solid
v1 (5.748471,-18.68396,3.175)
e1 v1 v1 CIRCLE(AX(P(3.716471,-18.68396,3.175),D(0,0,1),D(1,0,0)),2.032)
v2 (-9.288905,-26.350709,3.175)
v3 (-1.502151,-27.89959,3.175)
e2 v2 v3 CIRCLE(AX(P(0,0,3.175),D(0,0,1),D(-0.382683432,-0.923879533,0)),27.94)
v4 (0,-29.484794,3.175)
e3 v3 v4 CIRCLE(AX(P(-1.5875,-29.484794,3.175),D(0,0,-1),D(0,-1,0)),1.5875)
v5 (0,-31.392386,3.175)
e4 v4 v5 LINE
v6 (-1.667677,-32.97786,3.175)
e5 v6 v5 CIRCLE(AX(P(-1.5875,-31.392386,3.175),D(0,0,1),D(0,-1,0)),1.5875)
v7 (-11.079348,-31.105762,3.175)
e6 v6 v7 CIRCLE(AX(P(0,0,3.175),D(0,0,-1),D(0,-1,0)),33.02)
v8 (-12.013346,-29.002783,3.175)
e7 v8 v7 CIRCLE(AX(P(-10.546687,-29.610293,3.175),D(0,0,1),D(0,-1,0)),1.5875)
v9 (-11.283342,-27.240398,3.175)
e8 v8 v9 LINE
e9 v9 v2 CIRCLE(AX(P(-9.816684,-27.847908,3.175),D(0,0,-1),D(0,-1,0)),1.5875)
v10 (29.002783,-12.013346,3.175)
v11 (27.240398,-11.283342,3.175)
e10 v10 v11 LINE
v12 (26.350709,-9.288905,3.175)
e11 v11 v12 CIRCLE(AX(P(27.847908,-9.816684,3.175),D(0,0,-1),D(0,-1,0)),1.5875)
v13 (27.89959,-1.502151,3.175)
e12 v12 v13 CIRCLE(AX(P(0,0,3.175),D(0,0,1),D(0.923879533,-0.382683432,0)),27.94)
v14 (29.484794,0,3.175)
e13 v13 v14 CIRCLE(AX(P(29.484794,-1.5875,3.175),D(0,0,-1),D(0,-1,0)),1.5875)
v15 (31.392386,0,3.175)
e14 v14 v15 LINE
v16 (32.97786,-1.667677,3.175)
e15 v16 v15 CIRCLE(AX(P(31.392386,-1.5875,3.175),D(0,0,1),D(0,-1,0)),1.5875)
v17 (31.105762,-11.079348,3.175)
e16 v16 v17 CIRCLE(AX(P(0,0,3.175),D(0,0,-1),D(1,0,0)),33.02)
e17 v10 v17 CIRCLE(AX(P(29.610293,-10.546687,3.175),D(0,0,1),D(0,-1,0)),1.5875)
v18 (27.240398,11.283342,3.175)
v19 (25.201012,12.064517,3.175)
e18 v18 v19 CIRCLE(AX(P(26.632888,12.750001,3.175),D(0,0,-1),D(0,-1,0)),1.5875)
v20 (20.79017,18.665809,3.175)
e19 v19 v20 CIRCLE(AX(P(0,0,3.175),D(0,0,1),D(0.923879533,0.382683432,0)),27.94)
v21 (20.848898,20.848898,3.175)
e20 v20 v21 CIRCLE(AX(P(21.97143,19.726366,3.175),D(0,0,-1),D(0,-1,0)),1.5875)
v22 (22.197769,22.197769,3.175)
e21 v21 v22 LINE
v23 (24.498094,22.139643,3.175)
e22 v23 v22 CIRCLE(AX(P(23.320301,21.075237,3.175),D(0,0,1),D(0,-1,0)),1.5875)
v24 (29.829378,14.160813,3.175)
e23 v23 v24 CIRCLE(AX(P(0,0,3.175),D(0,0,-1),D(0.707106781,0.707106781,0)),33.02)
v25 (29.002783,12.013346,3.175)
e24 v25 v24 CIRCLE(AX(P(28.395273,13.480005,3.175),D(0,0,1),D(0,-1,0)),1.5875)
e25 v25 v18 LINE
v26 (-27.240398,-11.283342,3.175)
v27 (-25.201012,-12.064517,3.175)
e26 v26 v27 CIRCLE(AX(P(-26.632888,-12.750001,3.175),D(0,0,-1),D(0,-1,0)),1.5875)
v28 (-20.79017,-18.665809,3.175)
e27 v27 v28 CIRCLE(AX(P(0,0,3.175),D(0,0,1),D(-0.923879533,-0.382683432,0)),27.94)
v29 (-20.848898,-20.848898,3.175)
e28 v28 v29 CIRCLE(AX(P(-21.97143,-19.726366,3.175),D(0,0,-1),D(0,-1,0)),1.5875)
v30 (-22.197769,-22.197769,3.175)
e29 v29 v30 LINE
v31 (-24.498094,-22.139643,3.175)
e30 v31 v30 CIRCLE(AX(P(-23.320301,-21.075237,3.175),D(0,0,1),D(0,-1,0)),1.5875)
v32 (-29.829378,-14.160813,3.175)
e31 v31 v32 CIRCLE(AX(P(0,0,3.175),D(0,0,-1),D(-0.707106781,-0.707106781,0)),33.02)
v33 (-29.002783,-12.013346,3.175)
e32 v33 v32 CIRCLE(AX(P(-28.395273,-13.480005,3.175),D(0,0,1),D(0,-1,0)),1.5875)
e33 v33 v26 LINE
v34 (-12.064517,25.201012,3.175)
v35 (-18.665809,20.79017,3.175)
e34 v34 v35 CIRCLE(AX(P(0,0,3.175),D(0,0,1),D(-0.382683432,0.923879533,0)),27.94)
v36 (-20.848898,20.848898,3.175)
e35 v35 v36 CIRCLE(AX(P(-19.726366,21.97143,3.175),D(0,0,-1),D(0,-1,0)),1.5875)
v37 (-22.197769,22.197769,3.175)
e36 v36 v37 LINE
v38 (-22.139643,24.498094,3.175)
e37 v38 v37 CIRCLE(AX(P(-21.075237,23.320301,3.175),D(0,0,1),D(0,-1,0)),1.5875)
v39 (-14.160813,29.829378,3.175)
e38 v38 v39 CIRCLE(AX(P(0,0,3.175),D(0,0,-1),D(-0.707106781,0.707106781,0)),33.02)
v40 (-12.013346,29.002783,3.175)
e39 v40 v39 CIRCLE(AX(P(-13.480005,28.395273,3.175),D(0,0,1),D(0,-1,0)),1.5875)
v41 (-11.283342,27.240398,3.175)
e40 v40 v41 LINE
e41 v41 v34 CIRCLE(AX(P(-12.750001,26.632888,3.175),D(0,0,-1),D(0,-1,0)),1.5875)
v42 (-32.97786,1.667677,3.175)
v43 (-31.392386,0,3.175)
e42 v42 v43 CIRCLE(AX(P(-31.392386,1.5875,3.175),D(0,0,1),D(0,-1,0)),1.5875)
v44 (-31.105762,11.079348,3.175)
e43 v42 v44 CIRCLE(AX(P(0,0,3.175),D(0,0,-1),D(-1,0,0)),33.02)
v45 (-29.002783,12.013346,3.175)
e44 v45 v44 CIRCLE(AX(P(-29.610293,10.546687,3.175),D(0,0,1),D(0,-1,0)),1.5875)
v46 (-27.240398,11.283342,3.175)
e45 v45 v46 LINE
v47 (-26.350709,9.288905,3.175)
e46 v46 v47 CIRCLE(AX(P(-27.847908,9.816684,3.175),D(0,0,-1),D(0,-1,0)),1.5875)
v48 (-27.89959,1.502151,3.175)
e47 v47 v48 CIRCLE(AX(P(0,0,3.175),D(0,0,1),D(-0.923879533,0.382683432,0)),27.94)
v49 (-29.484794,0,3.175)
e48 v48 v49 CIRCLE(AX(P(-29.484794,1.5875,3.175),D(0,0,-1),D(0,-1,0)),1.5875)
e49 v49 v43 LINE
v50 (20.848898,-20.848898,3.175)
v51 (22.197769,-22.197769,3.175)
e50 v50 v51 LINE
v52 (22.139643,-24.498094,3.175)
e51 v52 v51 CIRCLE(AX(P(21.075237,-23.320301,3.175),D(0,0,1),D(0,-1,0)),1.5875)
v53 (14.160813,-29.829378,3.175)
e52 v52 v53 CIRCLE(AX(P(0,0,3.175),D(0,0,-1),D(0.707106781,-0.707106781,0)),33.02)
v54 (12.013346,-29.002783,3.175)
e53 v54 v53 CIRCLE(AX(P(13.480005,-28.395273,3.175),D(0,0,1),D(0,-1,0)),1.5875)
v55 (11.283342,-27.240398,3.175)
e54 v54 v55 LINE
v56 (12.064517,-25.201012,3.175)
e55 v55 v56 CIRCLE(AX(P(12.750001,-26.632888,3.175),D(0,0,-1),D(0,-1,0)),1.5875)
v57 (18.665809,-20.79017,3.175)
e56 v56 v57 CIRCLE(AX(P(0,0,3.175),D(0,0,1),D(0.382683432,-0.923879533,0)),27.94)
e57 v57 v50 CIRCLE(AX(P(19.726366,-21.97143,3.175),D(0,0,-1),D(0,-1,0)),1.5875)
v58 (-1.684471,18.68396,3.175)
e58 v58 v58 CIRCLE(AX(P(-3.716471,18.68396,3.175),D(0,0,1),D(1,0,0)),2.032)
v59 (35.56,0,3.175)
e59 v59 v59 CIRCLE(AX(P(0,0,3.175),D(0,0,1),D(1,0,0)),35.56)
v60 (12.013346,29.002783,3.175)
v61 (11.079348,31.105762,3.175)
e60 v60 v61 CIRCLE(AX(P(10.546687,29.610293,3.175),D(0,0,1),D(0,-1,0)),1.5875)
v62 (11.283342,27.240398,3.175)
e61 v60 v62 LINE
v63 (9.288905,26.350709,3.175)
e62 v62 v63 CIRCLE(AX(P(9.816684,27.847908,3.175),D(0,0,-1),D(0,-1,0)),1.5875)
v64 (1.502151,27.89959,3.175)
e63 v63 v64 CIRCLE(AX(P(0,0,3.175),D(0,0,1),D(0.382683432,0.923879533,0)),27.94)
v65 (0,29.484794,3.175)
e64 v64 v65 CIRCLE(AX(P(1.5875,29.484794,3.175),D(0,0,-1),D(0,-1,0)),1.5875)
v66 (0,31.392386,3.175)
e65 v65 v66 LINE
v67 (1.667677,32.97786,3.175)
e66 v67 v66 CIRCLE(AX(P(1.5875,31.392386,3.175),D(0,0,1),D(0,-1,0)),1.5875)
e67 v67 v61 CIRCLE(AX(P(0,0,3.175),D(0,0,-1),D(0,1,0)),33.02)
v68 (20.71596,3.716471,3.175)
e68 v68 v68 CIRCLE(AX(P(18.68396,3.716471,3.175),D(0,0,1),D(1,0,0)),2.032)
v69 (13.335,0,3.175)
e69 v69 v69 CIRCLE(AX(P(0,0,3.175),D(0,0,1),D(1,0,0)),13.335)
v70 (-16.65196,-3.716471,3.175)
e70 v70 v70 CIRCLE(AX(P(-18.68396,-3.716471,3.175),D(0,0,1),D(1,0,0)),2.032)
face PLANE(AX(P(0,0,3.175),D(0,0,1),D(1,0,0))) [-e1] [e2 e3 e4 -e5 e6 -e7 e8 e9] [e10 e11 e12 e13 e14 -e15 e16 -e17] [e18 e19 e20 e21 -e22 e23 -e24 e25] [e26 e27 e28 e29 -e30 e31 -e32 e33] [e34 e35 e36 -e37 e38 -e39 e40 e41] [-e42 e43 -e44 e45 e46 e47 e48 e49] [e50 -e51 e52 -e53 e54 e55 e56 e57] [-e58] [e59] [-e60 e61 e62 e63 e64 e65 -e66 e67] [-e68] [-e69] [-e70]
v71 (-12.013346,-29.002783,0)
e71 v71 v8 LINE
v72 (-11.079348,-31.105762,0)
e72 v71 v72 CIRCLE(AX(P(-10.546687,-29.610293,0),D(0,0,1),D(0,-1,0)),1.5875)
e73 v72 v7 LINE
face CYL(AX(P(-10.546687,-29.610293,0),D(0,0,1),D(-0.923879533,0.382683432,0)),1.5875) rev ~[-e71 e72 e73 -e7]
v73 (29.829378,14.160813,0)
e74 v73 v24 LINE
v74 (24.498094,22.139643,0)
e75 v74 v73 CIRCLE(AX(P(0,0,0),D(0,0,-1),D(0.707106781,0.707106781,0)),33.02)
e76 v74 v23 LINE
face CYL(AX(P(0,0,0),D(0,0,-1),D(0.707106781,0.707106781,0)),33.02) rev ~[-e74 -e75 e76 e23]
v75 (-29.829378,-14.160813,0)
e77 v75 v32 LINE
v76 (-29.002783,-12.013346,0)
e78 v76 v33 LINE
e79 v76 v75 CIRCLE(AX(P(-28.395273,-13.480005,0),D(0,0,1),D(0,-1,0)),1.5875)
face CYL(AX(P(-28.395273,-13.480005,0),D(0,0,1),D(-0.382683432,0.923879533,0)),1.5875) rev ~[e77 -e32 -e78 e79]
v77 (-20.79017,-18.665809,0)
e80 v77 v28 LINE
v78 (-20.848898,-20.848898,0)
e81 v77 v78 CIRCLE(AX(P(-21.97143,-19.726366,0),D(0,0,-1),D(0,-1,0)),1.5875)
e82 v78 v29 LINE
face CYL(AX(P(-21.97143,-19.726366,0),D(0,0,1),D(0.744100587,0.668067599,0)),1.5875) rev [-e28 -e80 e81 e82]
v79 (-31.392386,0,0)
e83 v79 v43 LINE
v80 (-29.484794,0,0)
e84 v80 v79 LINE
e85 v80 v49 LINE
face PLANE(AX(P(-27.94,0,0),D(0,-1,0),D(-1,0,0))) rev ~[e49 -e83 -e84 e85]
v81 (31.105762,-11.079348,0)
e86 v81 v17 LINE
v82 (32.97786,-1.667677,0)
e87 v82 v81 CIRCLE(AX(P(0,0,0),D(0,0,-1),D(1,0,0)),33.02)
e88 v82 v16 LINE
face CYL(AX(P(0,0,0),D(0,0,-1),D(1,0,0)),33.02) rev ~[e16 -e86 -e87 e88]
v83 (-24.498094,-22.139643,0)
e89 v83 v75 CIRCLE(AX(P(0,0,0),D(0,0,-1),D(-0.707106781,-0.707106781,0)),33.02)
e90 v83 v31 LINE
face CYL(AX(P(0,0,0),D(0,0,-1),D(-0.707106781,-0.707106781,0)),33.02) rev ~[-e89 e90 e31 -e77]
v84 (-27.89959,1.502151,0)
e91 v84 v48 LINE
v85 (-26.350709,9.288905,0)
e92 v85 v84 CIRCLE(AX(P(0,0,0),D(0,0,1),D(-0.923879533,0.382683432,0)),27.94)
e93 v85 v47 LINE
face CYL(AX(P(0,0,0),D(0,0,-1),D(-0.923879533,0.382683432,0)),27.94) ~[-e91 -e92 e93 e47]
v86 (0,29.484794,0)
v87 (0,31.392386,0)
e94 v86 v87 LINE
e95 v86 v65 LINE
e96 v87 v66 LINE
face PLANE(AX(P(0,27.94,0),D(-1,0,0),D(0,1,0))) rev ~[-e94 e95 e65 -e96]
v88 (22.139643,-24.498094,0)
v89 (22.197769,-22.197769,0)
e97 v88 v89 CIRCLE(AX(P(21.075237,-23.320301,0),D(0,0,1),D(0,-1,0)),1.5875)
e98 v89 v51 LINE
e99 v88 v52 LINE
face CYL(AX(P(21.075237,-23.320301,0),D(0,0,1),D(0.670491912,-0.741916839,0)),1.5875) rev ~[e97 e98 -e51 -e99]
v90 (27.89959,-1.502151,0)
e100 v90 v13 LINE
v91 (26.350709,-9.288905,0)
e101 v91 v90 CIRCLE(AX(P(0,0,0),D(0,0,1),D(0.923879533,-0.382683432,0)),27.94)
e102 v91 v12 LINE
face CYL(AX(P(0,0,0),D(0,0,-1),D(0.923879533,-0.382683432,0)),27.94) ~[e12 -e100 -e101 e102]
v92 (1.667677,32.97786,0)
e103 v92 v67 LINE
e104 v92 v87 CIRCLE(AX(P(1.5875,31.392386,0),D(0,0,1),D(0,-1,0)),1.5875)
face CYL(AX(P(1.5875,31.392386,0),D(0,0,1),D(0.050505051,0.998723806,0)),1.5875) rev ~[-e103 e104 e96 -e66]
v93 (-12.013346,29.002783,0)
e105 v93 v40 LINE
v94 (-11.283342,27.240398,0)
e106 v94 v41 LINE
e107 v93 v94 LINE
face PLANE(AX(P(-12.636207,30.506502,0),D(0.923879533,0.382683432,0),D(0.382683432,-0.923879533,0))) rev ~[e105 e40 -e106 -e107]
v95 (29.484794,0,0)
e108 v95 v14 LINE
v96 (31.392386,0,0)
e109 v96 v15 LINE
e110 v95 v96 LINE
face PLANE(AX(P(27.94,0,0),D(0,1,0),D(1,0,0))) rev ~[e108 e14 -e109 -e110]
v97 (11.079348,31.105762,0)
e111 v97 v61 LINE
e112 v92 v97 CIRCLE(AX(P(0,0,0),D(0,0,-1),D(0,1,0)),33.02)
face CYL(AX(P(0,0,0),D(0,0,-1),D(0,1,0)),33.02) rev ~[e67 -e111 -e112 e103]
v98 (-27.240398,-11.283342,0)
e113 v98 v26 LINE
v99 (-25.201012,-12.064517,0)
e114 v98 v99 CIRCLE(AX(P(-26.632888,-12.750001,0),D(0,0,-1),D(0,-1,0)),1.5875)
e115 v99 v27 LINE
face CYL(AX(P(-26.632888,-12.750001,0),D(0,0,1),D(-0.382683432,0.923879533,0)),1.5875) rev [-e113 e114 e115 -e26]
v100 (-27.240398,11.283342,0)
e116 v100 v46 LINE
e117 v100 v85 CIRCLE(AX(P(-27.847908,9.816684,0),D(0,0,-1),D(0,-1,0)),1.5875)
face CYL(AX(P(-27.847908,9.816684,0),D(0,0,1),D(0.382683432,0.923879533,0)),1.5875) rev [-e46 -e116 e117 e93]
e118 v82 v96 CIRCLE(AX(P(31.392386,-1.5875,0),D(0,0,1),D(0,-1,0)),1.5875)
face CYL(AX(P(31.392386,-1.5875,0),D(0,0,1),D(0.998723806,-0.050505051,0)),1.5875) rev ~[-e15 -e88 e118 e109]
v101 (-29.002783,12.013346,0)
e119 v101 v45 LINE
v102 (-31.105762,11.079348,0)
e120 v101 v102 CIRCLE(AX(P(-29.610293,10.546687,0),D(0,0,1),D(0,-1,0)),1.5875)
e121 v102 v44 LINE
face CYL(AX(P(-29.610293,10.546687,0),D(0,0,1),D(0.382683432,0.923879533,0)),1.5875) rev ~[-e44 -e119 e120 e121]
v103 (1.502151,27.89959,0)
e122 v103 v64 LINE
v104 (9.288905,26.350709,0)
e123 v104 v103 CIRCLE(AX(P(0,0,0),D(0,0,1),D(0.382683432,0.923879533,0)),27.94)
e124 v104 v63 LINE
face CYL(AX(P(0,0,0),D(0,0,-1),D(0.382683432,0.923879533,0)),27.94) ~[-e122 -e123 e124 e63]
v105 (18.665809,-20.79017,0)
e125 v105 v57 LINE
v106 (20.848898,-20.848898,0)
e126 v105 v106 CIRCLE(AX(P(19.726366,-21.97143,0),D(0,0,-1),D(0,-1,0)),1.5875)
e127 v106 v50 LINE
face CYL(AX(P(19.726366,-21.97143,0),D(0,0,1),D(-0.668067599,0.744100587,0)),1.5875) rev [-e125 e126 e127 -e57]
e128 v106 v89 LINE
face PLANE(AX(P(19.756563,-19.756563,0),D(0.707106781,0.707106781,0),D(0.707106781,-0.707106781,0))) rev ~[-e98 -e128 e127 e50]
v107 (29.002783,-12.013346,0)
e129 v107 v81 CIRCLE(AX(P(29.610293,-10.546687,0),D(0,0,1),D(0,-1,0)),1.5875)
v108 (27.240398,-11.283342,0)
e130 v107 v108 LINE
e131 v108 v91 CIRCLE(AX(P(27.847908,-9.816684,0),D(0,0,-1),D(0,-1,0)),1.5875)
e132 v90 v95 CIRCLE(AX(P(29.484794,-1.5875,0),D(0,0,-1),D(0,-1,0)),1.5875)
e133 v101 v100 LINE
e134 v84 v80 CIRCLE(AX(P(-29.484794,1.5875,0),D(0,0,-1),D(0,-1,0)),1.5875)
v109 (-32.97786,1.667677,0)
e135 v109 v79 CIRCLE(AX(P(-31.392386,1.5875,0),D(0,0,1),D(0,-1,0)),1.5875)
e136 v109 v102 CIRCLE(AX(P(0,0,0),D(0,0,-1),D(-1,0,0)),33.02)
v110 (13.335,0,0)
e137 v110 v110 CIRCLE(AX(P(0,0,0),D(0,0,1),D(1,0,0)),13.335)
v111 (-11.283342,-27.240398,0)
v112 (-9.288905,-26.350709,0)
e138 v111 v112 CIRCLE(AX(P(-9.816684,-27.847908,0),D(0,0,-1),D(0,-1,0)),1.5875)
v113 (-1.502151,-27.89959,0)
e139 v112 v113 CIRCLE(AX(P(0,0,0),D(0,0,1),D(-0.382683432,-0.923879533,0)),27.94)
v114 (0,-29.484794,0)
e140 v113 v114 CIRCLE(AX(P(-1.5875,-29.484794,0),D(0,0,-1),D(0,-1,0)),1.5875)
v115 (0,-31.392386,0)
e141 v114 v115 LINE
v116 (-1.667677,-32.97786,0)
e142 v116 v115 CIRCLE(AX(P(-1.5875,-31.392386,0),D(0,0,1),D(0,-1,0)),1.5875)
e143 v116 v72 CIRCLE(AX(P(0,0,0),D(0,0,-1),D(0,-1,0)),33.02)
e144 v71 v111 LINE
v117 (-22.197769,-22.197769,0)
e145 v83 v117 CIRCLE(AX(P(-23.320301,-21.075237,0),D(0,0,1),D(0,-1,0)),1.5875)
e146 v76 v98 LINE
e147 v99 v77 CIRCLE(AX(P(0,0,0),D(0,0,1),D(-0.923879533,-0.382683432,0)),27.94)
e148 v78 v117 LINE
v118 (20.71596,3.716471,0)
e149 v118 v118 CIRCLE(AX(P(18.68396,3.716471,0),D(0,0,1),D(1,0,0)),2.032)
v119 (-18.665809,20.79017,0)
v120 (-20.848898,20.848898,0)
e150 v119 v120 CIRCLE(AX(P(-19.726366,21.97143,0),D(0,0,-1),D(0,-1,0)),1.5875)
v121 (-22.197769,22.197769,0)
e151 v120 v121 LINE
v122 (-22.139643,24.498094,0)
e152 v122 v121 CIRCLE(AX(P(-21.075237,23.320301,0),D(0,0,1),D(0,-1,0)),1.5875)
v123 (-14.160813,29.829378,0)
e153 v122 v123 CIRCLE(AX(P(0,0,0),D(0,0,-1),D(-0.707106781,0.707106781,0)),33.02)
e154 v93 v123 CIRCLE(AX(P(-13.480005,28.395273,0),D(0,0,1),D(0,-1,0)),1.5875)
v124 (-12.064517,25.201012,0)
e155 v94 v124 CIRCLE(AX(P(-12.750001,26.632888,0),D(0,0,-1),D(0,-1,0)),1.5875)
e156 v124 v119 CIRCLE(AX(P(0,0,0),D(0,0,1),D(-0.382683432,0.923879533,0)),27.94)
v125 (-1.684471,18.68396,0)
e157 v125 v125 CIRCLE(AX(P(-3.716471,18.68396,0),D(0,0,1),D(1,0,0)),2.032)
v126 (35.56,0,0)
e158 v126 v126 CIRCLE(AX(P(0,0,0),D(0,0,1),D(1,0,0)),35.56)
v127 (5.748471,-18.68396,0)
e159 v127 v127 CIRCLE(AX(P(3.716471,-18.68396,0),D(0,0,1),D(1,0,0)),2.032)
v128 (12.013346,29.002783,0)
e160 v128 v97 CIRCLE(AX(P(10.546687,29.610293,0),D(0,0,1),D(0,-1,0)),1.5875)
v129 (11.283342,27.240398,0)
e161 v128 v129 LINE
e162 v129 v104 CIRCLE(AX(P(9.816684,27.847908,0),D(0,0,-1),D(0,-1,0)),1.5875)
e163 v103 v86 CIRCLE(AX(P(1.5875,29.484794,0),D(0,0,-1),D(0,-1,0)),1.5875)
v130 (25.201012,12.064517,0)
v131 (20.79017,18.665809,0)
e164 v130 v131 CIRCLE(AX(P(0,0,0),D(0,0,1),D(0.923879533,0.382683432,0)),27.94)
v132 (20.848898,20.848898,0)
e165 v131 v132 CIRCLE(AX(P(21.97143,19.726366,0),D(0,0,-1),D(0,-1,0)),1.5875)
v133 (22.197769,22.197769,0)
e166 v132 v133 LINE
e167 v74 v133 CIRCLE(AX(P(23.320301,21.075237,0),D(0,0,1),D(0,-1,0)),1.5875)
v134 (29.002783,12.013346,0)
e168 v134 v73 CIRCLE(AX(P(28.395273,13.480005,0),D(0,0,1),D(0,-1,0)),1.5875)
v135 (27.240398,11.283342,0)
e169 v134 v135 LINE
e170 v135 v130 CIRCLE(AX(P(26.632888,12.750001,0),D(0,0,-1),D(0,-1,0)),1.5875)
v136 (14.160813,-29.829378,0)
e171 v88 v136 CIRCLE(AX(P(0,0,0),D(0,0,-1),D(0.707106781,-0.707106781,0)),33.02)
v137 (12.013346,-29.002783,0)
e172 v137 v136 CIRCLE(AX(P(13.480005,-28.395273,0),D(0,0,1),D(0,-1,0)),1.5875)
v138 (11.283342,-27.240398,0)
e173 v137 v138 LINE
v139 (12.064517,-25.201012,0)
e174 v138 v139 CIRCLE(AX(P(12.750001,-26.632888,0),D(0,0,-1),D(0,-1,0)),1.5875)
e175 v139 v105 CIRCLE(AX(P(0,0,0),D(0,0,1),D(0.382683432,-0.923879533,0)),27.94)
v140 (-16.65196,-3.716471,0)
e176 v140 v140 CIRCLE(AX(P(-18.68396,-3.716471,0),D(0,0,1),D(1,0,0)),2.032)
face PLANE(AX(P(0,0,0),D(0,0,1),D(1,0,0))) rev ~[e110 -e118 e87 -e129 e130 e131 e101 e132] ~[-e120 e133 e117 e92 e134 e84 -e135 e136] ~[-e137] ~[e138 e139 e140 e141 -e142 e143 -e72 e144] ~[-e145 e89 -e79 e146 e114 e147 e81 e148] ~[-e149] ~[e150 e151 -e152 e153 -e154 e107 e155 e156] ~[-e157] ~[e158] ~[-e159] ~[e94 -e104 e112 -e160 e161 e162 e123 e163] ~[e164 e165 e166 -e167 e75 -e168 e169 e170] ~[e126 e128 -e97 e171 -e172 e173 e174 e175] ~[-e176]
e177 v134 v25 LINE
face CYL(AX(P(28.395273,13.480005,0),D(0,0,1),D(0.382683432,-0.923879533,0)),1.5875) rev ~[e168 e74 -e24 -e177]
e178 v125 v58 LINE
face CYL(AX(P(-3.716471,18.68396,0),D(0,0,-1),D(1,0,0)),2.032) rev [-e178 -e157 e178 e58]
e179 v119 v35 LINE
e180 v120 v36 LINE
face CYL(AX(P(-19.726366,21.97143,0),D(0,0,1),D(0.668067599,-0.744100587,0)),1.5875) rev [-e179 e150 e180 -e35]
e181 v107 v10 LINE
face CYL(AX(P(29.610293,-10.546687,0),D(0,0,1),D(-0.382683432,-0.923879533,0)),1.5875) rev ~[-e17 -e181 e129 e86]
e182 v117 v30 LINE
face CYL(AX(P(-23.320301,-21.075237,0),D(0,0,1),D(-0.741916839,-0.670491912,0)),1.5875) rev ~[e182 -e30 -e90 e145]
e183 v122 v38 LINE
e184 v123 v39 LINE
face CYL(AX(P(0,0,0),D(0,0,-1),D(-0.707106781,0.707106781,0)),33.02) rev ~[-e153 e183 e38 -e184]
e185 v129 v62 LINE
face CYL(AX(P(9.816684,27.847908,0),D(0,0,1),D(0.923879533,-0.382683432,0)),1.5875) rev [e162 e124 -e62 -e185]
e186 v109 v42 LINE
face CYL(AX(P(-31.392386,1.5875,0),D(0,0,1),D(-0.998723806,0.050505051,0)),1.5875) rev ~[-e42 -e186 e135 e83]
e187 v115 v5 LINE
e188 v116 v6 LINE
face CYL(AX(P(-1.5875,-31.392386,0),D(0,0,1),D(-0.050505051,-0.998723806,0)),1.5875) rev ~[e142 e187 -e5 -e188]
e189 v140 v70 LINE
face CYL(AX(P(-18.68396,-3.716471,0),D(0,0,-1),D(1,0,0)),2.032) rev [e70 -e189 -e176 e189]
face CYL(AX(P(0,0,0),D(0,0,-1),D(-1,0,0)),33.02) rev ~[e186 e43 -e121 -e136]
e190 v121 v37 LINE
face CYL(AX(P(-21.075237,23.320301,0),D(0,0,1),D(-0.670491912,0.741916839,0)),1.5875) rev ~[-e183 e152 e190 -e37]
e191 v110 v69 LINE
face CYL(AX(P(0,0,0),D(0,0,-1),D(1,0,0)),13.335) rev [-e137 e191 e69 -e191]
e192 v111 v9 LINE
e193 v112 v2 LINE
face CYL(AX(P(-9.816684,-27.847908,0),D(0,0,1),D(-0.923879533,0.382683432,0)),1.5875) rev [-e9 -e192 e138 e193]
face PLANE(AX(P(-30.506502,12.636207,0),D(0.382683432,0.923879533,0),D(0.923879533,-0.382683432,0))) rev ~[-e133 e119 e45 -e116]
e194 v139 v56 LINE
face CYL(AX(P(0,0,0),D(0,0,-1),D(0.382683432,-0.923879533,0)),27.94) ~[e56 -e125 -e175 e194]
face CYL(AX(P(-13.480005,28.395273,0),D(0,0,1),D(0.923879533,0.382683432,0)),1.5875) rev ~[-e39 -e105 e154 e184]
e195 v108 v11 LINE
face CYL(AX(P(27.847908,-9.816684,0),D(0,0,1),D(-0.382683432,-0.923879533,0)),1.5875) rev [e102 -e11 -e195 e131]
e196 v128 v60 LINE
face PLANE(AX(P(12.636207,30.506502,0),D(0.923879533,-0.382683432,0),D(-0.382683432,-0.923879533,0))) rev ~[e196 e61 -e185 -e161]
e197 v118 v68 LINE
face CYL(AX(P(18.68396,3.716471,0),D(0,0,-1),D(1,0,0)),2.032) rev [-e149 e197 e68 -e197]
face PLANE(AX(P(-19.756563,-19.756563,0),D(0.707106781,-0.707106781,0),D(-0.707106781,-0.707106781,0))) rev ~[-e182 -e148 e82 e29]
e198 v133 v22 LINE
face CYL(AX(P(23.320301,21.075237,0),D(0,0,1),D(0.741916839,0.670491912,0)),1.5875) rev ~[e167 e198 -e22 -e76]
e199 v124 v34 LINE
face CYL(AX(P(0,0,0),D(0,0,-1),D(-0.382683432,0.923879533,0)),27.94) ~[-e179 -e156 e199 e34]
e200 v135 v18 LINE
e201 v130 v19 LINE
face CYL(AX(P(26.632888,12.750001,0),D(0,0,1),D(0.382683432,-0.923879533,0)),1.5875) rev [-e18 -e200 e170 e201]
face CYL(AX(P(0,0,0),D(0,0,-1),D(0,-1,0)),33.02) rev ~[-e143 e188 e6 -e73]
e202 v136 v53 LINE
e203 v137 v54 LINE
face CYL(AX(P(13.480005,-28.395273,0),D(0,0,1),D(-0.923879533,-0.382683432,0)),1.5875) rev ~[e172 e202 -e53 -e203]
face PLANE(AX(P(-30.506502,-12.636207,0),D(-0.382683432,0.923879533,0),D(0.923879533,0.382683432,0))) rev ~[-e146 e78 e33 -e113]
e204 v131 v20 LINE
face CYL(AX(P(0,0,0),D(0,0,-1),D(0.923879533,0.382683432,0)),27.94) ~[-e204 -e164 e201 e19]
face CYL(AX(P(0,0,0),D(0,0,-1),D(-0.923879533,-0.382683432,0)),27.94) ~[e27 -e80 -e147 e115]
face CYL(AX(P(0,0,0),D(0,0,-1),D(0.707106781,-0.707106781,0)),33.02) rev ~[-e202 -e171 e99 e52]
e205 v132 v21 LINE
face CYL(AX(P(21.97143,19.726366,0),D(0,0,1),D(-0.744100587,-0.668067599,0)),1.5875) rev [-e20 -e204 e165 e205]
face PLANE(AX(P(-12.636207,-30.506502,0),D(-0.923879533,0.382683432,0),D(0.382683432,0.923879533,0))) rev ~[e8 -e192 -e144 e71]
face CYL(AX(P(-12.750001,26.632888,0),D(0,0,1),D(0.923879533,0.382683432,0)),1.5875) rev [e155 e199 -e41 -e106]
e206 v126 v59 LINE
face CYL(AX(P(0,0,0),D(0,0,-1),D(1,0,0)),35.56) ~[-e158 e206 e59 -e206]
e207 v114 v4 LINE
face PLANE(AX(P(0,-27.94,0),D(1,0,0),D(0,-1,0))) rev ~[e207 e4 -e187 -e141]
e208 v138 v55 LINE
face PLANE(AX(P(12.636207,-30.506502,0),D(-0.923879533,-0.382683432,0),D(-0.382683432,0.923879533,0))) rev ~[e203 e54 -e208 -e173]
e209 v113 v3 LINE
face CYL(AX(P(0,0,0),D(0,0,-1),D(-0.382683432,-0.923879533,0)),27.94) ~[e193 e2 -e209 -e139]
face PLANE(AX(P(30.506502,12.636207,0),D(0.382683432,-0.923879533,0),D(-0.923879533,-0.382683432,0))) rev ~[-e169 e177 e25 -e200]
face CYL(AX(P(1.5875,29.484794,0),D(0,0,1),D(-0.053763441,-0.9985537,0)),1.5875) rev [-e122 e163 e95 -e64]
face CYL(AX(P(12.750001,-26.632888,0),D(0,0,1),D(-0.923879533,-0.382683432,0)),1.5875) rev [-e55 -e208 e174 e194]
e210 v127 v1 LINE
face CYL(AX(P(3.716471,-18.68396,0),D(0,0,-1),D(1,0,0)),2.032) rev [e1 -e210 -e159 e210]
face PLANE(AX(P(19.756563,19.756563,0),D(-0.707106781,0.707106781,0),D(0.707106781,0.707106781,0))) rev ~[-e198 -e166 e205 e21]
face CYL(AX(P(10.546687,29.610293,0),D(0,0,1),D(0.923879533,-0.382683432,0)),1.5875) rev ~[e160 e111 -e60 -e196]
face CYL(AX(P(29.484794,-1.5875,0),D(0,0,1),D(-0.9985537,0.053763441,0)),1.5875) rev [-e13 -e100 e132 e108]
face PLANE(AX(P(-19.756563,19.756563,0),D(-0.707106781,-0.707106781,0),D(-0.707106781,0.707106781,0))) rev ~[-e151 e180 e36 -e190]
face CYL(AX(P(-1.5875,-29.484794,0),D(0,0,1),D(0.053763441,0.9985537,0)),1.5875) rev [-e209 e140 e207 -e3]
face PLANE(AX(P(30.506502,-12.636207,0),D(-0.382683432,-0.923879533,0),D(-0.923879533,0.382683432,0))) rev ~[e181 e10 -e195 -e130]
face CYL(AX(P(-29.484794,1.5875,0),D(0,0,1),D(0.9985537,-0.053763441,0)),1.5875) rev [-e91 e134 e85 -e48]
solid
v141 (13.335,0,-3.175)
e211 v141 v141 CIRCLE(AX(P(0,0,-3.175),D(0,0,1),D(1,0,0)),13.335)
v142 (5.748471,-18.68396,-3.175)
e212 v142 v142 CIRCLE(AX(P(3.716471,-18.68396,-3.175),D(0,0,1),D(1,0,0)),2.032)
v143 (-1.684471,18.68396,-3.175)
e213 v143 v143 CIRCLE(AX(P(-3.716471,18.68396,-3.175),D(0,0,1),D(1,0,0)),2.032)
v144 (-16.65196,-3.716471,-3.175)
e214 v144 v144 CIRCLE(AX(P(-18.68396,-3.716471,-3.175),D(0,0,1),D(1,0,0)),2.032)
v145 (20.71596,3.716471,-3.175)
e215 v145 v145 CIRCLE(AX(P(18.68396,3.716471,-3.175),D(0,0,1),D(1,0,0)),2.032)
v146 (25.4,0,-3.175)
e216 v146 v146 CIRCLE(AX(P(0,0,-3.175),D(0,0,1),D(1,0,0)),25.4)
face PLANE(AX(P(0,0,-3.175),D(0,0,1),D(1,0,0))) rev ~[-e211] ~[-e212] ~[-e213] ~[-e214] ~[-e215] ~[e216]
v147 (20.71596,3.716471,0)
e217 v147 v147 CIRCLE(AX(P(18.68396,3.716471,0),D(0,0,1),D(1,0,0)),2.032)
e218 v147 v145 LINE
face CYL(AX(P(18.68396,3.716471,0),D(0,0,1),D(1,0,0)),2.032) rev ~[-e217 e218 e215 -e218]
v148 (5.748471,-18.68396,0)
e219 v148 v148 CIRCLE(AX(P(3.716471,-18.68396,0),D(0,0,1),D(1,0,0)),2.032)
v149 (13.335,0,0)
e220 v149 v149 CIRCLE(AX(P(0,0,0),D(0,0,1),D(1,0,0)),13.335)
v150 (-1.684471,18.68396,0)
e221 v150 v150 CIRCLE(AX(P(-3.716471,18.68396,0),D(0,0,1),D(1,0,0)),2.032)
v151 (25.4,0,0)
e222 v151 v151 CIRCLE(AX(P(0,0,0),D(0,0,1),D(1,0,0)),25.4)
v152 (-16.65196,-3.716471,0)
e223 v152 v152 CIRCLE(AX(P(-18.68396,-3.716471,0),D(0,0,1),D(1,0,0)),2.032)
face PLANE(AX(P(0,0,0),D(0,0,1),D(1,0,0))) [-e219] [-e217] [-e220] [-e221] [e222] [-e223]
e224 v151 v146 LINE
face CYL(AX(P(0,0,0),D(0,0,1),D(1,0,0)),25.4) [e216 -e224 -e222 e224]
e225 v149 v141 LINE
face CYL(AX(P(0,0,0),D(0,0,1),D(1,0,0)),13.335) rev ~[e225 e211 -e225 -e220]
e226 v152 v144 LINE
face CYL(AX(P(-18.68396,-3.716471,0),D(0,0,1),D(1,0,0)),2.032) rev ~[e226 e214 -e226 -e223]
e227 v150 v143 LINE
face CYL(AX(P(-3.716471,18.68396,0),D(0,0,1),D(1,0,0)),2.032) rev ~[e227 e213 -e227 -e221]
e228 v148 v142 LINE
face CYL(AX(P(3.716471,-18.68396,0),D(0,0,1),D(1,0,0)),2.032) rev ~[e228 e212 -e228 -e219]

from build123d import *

# Parameters (mm, degrees)
F0_R     = 35.56
F0_R_2   = 25.4
F0_R_3   = 2.032
F0_R_4   = 13.335
F1_DEPTH = 3.175
F2_R     = 1.5875
F3_DEPTH = 3.175


# Not quite as in the source:
# - a feature names something its author has since deleted; it is built from what else it names


with BuildPart() as f1:
    # F0 (on Top) → F1 (new body)
    with BuildSketch(Plane.XY):
        Circle(F0_R)
        with BuildLine():
            ThreePointArc((-10.6921751003, -25.8131941384), (-5.4508235971, -27.4031407345), (0, -27.94))
            Line((0, -27.94), (0, -33.02))
            ThreePointArc((0, -33.02), (-6.441882433, -32.3855299589), (-12.6362069367, -30.5065021635))
            Line((-12.6362069367, -30.5065021635), (-10.6921751003, -25.8131941384))
        make_face(mode=Mode.SUBTRACT)
        with BuildLine():
            ThreePointArc((-25.8131941384, -10.6921751003), (-23.2312609677, -15.5226323106), (-19.7565634664, -19.7565634664))
            Line((-19.7565634664, -19.7565634664), (-23.3486659148, -23.3486659148))
            ThreePointArc((-23.3486659148, -23.3486659148), (-27.4551265982, -18.3449290943), (-30.5065021635, -12.6362069367))
            Line((-30.5065021635, -12.6362069367), (-25.8131941384, -10.6921751003))
        make_face(mode=Mode.SUBTRACT)
        Circle(F0_R_2, mode=Mode.SUBTRACT)
        with BuildLine():
            ThreePointArc((10.6921751003, -25.8131941384), (15.5226323106, -23.2312609677), (19.7565634664, -19.7565634664))
            Line((19.7565634664, -19.7565634664), (23.3486659148, -23.3486659148))
            ThreePointArc((23.3486659148, -23.3486659148), (18.3449290943, -27.4551265982), (12.6362069367, -30.5065021635))
            Line((12.6362069367, -30.5065021635), (10.6921751003, -25.8131941384))
        make_face(mode=Mode.SUBTRACT)
        with BuildLine():
            ThreePointArc((25.8131941384, -10.6921751003), (27.4031407345, -5.4508235971), (27.94, 0))
            Line((27.94, 0), (33.02, 0))
            ThreePointArc((33.02, 0), (32.3855299589, -6.441882433), (30.5065021635, -12.6362069367))
            Line((30.5065021635, -12.6362069367), (25.8131941384, -10.6921751003))
        make_face(mode=Mode.SUBTRACT)
        with BuildLine():
            ThreePointArc((-25.8131941384, 10.6921751003), (-27.4031407345, 5.4508235971), (-27.94, 0))
            Line((-27.94, 0), (-33.02, 0))
            ThreePointArc((-33.02, 0), (-32.3855299589, 6.441882433), (-30.5065021635, 12.6362069367))
            Line((-30.5065021635, 12.6362069367), (-25.8131941384, 10.6921751003))
        make_face(mode=Mode.SUBTRACT)
        with BuildLine():
            ThreePointArc((-10.6921751003, 25.8131941384), (-15.5226323106, 23.2312609677), (-19.7565634664, 19.7565634664))
            Line((-19.7565634664, 19.7565634664), (-23.3486659148, 23.3486659148))
            ThreePointArc((-23.3486659148, 23.3486659148), (-18.3449290943, 27.4551265982), (-12.6362069367, 30.5065021635))
            Line((-12.6362069367, 30.5065021635), (-10.6921751003, 25.8131941384))
        make_face(mode=Mode.SUBTRACT)
        with BuildLine():
            ThreePointArc((25.8131941384, 10.6921751003), (23.2312609677, 15.5226323106), (19.7565634664, 19.7565634664))
            Line((19.7565634664, 19.7565634664), (23.3486659148, 23.3486659148))
            ThreePointArc((23.3486659148, 23.3486659148), (27.4551265982, 18.3449290943), (30.5065021635, 12.6362069367))
            Line((30.5065021635, 12.6362069367), (25.8131941384, 10.6921751003))
        make_face(mode=Mode.SUBTRACT)
        with BuildLine():
            ThreePointArc((10.6921751003, 25.8131941384), (5.4508235971, 27.4031407345), (0, 27.94))
            Line((0, 27.94), (0, 33.02))
            ThreePointArc((0, 33.02), (6.441882433, 32.3855299589), (12.6362069367, 30.5065021635))
            Line((12.6362069367, 30.5065021635), (10.6921751003, 25.8131941384))
        make_face(mode=Mode.SUBTRACT)
        Circle(F0_R_2)
        with Locations((-18.6839595917, -3.7164706344)):
            Circle(F0_R_3, mode=Mode.SUBTRACT)
        Circle(F0_R_4, mode=Mode.SUBTRACT)
        with Locations((3.7164706344, -18.6839595917)):
            Circle(F0_R_3, mode=Mode.SUBTRACT)
        with Locations((-3.7164706344, 18.6839595917)):
            Circle(F0_R_3, mode=Mode.SUBTRACT)
        with Locations((18.6839595917, 3.7164706344)):
            Circle(F0_R_3, mode=Mode.SUBTRACT)
    extrude(amount=F1_DEPTH)

    # F2
    f2_edges = [f1.edges().sort_by_distance(p)[0] for p in [
        (-12.636207, 30.506502, 1.5875),
        (0, 33.02, 1.5875),
        (-19.756563, -19.756563, 1.5875),
        (-25.813194, 10.692175, 1.5875),
        (-23.348666, 23.348666, 1.5875),
        (-30.506502, 12.636207, 1.5875),
        (-25.813194, -10.692175, 1.5875),
        (0, 27.94, 1.5875),
        (10.692175, 25.813194, 1.5875),
        (-30.506502, -12.636207, 1.5875),
        (-33.02, 0, 1.5875),
        (-19.756563, 19.756563, 1.5875),
        (12.636207, 30.506502, 1.5875),
        (-23.348666, -23.348666, 1.5875),
        (-27.94, 0, 1.5875),
        (-10.692175, 25.813194, 1.5875),
        (23.348666, 23.348666, 1.5875),
        (27.94, 0, 1.5875),
        (19.756563, -19.756563, 1.5875),
        (-10.692175, -25.813194, 1.5875),
        (19.756563, 19.756563, 1.5875),
        (25.813194, -10.692175, 1.5875),
        (10.692175, -25.813194, 1.5875),
        (-12.636207, -30.506502, 1.5875),
        (25.813194, 10.692175, 1.5875),
        (30.506502, -12.636207, 1.5875),
        (12.636207, -30.506502, 1.5875),
        (30.506502, 12.636207, 1.5875),
        (23.348666, -23.348666, 1.5875),
        (33.02, 0, 1.5875),
        (0, -27.94, 1.5875),
        (0, -33.02, 1.5875),
    ]]
    fillet(f2_edges, radius=F2_R)


with BuildPart() as f3:
    # F0 (on Top) → F3 (new body)
    with BuildSketch(Plane.XY):
        Circle(F0_R_2)
        with Locations((-18.6839595917, -3.7164706344)):
            Circle(F0_R_3, mode=Mode.SUBTRACT)
        Circle(F0_R_4, mode=Mode.SUBTRACT)
        with Locations((3.7164706344, -18.6839595917)):
            Circle(F0_R_3, mode=Mode.SUBTRACT)
        with Locations((-3.7164706344, 18.6839595917)):
            Circle(F0_R_3, mode=Mode.SUBTRACT)
        with Locations((18.6839595917, 3.7164706344)):
            Circle(F0_R_3, mode=Mode.SUBTRACT)
    extrude(amount=-F3_DEPTH)


solid = Compound([f1.part, f3.part])
